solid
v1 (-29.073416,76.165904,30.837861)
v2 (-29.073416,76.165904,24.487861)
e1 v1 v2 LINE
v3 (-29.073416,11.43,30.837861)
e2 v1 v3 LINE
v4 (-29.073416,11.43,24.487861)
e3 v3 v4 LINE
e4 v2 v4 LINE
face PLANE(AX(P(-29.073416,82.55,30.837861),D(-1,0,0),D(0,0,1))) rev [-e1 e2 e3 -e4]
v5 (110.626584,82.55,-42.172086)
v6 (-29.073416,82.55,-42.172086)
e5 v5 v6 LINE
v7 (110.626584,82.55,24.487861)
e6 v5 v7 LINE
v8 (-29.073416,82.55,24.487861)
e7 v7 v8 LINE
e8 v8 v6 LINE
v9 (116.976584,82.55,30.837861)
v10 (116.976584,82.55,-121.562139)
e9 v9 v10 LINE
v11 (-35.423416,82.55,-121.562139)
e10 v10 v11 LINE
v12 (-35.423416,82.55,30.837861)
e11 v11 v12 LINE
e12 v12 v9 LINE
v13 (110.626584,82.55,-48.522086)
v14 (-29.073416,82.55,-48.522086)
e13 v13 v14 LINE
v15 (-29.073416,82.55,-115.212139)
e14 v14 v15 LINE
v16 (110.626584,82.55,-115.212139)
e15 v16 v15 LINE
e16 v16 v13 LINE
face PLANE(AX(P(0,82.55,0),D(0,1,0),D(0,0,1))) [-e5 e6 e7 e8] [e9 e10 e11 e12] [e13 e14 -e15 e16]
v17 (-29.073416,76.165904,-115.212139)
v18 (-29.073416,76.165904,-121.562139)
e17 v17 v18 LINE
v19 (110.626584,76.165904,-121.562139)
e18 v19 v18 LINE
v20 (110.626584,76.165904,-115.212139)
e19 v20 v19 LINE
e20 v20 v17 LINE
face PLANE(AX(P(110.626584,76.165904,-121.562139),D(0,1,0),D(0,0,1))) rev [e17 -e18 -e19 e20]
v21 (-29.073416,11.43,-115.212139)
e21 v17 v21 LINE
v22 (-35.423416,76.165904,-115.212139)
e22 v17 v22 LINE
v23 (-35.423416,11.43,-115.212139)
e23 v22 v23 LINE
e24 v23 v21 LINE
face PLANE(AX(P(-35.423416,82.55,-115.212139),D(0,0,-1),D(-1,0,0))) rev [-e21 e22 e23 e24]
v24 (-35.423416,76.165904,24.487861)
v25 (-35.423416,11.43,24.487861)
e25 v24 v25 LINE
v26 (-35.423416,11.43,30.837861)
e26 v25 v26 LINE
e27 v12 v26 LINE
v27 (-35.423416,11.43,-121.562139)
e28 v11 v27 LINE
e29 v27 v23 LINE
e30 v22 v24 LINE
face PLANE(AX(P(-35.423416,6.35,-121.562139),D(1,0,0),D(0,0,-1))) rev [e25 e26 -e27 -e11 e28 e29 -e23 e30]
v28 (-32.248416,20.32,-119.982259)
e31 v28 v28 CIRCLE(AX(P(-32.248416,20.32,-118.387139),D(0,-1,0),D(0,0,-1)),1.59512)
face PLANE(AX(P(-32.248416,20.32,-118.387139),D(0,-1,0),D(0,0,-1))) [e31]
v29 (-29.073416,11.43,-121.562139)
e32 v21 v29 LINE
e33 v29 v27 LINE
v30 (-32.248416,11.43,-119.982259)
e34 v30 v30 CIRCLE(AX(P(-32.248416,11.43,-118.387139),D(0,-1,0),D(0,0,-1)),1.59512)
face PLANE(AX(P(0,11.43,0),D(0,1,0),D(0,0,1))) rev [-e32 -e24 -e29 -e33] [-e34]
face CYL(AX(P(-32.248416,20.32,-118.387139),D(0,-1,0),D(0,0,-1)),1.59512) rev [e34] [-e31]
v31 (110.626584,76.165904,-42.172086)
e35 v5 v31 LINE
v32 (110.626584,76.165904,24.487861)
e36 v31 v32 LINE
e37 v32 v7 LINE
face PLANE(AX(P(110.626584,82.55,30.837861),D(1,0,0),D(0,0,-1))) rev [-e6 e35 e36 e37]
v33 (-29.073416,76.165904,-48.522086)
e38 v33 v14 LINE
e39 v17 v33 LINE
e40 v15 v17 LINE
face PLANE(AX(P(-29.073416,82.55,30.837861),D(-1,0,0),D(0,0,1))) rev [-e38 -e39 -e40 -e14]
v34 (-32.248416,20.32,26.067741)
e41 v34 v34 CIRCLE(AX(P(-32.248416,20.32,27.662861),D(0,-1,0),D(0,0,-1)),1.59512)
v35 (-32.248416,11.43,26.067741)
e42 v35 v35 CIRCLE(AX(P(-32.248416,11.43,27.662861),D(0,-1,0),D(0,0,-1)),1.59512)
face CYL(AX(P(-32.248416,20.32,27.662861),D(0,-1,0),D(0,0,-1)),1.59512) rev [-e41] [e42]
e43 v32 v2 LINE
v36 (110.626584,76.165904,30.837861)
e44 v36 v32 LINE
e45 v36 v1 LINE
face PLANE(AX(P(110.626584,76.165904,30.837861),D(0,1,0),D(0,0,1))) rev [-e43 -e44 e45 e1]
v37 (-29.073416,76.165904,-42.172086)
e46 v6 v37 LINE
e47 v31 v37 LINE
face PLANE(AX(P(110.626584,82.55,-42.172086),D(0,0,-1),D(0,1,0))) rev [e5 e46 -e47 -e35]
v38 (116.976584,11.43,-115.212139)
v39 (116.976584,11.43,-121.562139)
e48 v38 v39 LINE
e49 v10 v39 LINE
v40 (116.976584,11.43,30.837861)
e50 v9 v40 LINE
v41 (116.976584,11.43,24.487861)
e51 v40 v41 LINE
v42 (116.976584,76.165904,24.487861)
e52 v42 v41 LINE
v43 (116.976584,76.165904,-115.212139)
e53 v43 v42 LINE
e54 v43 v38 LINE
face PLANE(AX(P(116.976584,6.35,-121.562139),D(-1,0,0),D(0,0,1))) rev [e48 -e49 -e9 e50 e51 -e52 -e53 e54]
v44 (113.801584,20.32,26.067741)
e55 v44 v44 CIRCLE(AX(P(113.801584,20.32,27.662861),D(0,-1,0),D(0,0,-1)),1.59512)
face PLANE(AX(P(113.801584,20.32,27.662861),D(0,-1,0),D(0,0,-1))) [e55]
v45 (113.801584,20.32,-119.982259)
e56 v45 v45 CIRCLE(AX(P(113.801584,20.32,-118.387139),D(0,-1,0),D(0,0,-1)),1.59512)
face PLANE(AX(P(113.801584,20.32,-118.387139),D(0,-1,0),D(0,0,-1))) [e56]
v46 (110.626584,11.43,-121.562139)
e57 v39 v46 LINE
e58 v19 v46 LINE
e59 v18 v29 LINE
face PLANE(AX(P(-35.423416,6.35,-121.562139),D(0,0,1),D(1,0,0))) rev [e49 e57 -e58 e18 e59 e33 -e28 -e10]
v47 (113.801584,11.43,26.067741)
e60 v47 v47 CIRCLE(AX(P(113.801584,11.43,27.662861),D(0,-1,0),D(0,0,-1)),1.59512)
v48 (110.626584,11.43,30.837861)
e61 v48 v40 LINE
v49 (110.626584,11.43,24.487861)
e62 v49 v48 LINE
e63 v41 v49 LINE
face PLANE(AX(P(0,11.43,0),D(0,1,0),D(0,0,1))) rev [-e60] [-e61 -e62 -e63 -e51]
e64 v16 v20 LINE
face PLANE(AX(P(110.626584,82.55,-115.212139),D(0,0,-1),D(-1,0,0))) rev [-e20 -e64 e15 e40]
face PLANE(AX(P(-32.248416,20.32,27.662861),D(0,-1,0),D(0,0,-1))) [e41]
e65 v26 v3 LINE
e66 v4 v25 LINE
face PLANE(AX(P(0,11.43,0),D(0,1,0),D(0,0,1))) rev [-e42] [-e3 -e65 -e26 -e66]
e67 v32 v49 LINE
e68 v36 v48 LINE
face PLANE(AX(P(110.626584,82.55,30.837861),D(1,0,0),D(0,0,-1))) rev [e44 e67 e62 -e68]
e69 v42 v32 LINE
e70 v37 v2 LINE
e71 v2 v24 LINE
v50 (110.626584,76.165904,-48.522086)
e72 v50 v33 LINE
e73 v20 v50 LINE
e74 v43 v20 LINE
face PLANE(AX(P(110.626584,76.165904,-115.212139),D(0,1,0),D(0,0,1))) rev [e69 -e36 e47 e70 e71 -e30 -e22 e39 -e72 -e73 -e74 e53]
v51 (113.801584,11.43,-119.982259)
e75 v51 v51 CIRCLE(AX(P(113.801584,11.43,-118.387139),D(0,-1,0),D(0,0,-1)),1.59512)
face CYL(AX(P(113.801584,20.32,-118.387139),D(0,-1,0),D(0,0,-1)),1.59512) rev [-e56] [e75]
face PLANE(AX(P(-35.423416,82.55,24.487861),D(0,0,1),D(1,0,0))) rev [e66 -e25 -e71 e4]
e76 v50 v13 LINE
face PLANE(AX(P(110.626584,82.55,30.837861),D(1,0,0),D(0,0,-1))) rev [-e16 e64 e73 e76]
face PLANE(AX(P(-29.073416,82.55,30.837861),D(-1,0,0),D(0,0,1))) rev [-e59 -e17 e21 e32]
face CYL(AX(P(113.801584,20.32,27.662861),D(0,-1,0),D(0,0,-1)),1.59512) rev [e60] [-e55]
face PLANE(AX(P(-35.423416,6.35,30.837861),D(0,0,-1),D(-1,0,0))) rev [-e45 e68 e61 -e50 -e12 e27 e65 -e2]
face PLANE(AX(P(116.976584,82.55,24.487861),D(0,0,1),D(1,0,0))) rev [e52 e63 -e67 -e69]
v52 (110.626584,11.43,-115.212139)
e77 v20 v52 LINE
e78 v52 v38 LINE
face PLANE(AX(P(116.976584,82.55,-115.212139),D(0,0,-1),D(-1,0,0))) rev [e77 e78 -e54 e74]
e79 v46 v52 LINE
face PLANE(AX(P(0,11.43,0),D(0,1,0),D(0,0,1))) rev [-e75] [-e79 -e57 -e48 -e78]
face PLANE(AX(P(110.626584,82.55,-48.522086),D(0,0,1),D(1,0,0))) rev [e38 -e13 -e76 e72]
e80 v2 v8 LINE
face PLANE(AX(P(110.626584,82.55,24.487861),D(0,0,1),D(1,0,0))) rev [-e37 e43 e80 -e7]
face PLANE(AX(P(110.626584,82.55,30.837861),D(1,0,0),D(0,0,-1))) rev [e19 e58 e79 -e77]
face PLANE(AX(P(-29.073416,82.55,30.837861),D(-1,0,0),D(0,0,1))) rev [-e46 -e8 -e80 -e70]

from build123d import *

# Parameters (mm, degrees)
STOCK_PLATE_BETA1_1_START       = 76.165904354
STOCK_PLATE_BETA1_1_OUTLINE_W   = 152.4
STOCK_PLATE_BETA1_1_OUTLINE_H   = 152.4
STOCK_PLATE_BETA1_1_OUTLINE_W_2 = 139.7
STOCK_PLATE_BETA1_1_OUTLINE_H_2 = 66.690053594
STOCK_PLATE_BETA1_1_OUTLINE_H_3 = 66.659946406
STOCK_PLATE_BETA1_1_DEPTH       = 6.384095646
STOCK_PLATE_BETA1_1_START_2     = 11.43
STOCK_PLATE_BETA1_1_2_OUTLINE_W = 6.35
STOCK_PLATE_BETA1_1_2_OUTLINE_H = 6.35
STOCK_PLATE_BETA1_1_2_DEPTH     = 64.735904354
SKETCH1_R                       = 1.59512
CUT_EXTRUDE2_DEPTH              = 8.89


# Read off the part's stored shape, not the designer's step: Stock-plate_beta1-1
with BuildPart() as part:
    # Stock-plate_beta1-1 outline → Stock-plate_beta1-1 (new body)
    with BuildSketch(Plane(origin=(0, 0, 0), x_dir=(1, 0, 0), z_dir=(0, 1, 0)).offset(STOCK_PLATE_BETA1_1_START)):
        with Locations((40.776583963, 45.362139437)):
            Rectangle(STOCK_PLATE_BETA1_1_OUTLINE_W, STOCK_PLATE_BETA1_1_OUTLINE_H)
        with Locations((40.776583963, 81.86711264)):
            Rectangle(STOCK_PLATE_BETA1_1_OUTLINE_W_2, STOCK_PLATE_BETA1_1_OUTLINE_H_2, mode=Mode.SUBTRACT)
        with Locations((40.776583963, 8.84211264)):
            Rectangle(STOCK_PLATE_BETA1_1_OUTLINE_W_2, STOCK_PLATE_BETA1_1_OUTLINE_H_3, mode=Mode.SUBTRACT)
    extrude(amount=STOCK_PLATE_BETA1_1_DEPTH)

    # Stock-plate_beta1-1 2 outline → Stock-plate_beta1-1 2 (add)
    with BuildSketch(Plane(origin=(0, 0, 0), x_dir=(1, 0, 0), z_dir=(0, 1, 0)).offset(STOCK_PLATE_BETA1_1_START_2)):
        with Locations((-32.248416037, 118.387139437)):
            Rectangle(STOCK_PLATE_BETA1_1_2_OUTLINE_W, STOCK_PLATE_BETA1_1_2_OUTLINE_H)
        with Locations((113.801583963, 118.387139437)):
            Rectangle(STOCK_PLATE_BETA1_1_2_OUTLINE_W, STOCK_PLATE_BETA1_1_2_OUTLINE_H)
        with Locations((-32.248416037, -27.662860563)):
            Rectangle(STOCK_PLATE_BETA1_1_2_OUTLINE_W, STOCK_PLATE_BETA1_1_2_OUTLINE_H)
        with Locations((113.801583963, -27.662860563)):
            Rectangle(STOCK_PLATE_BETA1_1_2_OUTLINE_W, STOCK_PLATE_BETA1_1_2_OUTLINE_H)
    extrude(amount=STOCK_PLATE_BETA1_1_2_DEPTH)

    # Sketch1 → Cut-Extrude2 (cut)
    with BuildSketch(Plane(origin=(0, 11.43, 0), x_dir=(-1, 0, 0), z_dir=(0, -1, 0))):
        with Locations(Location((32.248416037, -27.662860563, 0), (0, 0, 90))):
            Circle(SKETCH1_R)
        with Locations(Location((-113.801583963, -27.662860563, 0), (0, 0, 90))):
            Circle(SKETCH1_R)
        with Locations(Location((-113.801583963, 118.387139437, 0), (0, 0, 90))):
            Circle(SKETCH1_R)
        with Locations(Location((32.248416037, 118.387139437, 0), (0, 0, 90))):
            Circle(SKETCH1_R)
    extrude(amount=-CUT_EXTRUDE2_DEPTH, mode=Mode.SUBTRACT)


solid = part.part
